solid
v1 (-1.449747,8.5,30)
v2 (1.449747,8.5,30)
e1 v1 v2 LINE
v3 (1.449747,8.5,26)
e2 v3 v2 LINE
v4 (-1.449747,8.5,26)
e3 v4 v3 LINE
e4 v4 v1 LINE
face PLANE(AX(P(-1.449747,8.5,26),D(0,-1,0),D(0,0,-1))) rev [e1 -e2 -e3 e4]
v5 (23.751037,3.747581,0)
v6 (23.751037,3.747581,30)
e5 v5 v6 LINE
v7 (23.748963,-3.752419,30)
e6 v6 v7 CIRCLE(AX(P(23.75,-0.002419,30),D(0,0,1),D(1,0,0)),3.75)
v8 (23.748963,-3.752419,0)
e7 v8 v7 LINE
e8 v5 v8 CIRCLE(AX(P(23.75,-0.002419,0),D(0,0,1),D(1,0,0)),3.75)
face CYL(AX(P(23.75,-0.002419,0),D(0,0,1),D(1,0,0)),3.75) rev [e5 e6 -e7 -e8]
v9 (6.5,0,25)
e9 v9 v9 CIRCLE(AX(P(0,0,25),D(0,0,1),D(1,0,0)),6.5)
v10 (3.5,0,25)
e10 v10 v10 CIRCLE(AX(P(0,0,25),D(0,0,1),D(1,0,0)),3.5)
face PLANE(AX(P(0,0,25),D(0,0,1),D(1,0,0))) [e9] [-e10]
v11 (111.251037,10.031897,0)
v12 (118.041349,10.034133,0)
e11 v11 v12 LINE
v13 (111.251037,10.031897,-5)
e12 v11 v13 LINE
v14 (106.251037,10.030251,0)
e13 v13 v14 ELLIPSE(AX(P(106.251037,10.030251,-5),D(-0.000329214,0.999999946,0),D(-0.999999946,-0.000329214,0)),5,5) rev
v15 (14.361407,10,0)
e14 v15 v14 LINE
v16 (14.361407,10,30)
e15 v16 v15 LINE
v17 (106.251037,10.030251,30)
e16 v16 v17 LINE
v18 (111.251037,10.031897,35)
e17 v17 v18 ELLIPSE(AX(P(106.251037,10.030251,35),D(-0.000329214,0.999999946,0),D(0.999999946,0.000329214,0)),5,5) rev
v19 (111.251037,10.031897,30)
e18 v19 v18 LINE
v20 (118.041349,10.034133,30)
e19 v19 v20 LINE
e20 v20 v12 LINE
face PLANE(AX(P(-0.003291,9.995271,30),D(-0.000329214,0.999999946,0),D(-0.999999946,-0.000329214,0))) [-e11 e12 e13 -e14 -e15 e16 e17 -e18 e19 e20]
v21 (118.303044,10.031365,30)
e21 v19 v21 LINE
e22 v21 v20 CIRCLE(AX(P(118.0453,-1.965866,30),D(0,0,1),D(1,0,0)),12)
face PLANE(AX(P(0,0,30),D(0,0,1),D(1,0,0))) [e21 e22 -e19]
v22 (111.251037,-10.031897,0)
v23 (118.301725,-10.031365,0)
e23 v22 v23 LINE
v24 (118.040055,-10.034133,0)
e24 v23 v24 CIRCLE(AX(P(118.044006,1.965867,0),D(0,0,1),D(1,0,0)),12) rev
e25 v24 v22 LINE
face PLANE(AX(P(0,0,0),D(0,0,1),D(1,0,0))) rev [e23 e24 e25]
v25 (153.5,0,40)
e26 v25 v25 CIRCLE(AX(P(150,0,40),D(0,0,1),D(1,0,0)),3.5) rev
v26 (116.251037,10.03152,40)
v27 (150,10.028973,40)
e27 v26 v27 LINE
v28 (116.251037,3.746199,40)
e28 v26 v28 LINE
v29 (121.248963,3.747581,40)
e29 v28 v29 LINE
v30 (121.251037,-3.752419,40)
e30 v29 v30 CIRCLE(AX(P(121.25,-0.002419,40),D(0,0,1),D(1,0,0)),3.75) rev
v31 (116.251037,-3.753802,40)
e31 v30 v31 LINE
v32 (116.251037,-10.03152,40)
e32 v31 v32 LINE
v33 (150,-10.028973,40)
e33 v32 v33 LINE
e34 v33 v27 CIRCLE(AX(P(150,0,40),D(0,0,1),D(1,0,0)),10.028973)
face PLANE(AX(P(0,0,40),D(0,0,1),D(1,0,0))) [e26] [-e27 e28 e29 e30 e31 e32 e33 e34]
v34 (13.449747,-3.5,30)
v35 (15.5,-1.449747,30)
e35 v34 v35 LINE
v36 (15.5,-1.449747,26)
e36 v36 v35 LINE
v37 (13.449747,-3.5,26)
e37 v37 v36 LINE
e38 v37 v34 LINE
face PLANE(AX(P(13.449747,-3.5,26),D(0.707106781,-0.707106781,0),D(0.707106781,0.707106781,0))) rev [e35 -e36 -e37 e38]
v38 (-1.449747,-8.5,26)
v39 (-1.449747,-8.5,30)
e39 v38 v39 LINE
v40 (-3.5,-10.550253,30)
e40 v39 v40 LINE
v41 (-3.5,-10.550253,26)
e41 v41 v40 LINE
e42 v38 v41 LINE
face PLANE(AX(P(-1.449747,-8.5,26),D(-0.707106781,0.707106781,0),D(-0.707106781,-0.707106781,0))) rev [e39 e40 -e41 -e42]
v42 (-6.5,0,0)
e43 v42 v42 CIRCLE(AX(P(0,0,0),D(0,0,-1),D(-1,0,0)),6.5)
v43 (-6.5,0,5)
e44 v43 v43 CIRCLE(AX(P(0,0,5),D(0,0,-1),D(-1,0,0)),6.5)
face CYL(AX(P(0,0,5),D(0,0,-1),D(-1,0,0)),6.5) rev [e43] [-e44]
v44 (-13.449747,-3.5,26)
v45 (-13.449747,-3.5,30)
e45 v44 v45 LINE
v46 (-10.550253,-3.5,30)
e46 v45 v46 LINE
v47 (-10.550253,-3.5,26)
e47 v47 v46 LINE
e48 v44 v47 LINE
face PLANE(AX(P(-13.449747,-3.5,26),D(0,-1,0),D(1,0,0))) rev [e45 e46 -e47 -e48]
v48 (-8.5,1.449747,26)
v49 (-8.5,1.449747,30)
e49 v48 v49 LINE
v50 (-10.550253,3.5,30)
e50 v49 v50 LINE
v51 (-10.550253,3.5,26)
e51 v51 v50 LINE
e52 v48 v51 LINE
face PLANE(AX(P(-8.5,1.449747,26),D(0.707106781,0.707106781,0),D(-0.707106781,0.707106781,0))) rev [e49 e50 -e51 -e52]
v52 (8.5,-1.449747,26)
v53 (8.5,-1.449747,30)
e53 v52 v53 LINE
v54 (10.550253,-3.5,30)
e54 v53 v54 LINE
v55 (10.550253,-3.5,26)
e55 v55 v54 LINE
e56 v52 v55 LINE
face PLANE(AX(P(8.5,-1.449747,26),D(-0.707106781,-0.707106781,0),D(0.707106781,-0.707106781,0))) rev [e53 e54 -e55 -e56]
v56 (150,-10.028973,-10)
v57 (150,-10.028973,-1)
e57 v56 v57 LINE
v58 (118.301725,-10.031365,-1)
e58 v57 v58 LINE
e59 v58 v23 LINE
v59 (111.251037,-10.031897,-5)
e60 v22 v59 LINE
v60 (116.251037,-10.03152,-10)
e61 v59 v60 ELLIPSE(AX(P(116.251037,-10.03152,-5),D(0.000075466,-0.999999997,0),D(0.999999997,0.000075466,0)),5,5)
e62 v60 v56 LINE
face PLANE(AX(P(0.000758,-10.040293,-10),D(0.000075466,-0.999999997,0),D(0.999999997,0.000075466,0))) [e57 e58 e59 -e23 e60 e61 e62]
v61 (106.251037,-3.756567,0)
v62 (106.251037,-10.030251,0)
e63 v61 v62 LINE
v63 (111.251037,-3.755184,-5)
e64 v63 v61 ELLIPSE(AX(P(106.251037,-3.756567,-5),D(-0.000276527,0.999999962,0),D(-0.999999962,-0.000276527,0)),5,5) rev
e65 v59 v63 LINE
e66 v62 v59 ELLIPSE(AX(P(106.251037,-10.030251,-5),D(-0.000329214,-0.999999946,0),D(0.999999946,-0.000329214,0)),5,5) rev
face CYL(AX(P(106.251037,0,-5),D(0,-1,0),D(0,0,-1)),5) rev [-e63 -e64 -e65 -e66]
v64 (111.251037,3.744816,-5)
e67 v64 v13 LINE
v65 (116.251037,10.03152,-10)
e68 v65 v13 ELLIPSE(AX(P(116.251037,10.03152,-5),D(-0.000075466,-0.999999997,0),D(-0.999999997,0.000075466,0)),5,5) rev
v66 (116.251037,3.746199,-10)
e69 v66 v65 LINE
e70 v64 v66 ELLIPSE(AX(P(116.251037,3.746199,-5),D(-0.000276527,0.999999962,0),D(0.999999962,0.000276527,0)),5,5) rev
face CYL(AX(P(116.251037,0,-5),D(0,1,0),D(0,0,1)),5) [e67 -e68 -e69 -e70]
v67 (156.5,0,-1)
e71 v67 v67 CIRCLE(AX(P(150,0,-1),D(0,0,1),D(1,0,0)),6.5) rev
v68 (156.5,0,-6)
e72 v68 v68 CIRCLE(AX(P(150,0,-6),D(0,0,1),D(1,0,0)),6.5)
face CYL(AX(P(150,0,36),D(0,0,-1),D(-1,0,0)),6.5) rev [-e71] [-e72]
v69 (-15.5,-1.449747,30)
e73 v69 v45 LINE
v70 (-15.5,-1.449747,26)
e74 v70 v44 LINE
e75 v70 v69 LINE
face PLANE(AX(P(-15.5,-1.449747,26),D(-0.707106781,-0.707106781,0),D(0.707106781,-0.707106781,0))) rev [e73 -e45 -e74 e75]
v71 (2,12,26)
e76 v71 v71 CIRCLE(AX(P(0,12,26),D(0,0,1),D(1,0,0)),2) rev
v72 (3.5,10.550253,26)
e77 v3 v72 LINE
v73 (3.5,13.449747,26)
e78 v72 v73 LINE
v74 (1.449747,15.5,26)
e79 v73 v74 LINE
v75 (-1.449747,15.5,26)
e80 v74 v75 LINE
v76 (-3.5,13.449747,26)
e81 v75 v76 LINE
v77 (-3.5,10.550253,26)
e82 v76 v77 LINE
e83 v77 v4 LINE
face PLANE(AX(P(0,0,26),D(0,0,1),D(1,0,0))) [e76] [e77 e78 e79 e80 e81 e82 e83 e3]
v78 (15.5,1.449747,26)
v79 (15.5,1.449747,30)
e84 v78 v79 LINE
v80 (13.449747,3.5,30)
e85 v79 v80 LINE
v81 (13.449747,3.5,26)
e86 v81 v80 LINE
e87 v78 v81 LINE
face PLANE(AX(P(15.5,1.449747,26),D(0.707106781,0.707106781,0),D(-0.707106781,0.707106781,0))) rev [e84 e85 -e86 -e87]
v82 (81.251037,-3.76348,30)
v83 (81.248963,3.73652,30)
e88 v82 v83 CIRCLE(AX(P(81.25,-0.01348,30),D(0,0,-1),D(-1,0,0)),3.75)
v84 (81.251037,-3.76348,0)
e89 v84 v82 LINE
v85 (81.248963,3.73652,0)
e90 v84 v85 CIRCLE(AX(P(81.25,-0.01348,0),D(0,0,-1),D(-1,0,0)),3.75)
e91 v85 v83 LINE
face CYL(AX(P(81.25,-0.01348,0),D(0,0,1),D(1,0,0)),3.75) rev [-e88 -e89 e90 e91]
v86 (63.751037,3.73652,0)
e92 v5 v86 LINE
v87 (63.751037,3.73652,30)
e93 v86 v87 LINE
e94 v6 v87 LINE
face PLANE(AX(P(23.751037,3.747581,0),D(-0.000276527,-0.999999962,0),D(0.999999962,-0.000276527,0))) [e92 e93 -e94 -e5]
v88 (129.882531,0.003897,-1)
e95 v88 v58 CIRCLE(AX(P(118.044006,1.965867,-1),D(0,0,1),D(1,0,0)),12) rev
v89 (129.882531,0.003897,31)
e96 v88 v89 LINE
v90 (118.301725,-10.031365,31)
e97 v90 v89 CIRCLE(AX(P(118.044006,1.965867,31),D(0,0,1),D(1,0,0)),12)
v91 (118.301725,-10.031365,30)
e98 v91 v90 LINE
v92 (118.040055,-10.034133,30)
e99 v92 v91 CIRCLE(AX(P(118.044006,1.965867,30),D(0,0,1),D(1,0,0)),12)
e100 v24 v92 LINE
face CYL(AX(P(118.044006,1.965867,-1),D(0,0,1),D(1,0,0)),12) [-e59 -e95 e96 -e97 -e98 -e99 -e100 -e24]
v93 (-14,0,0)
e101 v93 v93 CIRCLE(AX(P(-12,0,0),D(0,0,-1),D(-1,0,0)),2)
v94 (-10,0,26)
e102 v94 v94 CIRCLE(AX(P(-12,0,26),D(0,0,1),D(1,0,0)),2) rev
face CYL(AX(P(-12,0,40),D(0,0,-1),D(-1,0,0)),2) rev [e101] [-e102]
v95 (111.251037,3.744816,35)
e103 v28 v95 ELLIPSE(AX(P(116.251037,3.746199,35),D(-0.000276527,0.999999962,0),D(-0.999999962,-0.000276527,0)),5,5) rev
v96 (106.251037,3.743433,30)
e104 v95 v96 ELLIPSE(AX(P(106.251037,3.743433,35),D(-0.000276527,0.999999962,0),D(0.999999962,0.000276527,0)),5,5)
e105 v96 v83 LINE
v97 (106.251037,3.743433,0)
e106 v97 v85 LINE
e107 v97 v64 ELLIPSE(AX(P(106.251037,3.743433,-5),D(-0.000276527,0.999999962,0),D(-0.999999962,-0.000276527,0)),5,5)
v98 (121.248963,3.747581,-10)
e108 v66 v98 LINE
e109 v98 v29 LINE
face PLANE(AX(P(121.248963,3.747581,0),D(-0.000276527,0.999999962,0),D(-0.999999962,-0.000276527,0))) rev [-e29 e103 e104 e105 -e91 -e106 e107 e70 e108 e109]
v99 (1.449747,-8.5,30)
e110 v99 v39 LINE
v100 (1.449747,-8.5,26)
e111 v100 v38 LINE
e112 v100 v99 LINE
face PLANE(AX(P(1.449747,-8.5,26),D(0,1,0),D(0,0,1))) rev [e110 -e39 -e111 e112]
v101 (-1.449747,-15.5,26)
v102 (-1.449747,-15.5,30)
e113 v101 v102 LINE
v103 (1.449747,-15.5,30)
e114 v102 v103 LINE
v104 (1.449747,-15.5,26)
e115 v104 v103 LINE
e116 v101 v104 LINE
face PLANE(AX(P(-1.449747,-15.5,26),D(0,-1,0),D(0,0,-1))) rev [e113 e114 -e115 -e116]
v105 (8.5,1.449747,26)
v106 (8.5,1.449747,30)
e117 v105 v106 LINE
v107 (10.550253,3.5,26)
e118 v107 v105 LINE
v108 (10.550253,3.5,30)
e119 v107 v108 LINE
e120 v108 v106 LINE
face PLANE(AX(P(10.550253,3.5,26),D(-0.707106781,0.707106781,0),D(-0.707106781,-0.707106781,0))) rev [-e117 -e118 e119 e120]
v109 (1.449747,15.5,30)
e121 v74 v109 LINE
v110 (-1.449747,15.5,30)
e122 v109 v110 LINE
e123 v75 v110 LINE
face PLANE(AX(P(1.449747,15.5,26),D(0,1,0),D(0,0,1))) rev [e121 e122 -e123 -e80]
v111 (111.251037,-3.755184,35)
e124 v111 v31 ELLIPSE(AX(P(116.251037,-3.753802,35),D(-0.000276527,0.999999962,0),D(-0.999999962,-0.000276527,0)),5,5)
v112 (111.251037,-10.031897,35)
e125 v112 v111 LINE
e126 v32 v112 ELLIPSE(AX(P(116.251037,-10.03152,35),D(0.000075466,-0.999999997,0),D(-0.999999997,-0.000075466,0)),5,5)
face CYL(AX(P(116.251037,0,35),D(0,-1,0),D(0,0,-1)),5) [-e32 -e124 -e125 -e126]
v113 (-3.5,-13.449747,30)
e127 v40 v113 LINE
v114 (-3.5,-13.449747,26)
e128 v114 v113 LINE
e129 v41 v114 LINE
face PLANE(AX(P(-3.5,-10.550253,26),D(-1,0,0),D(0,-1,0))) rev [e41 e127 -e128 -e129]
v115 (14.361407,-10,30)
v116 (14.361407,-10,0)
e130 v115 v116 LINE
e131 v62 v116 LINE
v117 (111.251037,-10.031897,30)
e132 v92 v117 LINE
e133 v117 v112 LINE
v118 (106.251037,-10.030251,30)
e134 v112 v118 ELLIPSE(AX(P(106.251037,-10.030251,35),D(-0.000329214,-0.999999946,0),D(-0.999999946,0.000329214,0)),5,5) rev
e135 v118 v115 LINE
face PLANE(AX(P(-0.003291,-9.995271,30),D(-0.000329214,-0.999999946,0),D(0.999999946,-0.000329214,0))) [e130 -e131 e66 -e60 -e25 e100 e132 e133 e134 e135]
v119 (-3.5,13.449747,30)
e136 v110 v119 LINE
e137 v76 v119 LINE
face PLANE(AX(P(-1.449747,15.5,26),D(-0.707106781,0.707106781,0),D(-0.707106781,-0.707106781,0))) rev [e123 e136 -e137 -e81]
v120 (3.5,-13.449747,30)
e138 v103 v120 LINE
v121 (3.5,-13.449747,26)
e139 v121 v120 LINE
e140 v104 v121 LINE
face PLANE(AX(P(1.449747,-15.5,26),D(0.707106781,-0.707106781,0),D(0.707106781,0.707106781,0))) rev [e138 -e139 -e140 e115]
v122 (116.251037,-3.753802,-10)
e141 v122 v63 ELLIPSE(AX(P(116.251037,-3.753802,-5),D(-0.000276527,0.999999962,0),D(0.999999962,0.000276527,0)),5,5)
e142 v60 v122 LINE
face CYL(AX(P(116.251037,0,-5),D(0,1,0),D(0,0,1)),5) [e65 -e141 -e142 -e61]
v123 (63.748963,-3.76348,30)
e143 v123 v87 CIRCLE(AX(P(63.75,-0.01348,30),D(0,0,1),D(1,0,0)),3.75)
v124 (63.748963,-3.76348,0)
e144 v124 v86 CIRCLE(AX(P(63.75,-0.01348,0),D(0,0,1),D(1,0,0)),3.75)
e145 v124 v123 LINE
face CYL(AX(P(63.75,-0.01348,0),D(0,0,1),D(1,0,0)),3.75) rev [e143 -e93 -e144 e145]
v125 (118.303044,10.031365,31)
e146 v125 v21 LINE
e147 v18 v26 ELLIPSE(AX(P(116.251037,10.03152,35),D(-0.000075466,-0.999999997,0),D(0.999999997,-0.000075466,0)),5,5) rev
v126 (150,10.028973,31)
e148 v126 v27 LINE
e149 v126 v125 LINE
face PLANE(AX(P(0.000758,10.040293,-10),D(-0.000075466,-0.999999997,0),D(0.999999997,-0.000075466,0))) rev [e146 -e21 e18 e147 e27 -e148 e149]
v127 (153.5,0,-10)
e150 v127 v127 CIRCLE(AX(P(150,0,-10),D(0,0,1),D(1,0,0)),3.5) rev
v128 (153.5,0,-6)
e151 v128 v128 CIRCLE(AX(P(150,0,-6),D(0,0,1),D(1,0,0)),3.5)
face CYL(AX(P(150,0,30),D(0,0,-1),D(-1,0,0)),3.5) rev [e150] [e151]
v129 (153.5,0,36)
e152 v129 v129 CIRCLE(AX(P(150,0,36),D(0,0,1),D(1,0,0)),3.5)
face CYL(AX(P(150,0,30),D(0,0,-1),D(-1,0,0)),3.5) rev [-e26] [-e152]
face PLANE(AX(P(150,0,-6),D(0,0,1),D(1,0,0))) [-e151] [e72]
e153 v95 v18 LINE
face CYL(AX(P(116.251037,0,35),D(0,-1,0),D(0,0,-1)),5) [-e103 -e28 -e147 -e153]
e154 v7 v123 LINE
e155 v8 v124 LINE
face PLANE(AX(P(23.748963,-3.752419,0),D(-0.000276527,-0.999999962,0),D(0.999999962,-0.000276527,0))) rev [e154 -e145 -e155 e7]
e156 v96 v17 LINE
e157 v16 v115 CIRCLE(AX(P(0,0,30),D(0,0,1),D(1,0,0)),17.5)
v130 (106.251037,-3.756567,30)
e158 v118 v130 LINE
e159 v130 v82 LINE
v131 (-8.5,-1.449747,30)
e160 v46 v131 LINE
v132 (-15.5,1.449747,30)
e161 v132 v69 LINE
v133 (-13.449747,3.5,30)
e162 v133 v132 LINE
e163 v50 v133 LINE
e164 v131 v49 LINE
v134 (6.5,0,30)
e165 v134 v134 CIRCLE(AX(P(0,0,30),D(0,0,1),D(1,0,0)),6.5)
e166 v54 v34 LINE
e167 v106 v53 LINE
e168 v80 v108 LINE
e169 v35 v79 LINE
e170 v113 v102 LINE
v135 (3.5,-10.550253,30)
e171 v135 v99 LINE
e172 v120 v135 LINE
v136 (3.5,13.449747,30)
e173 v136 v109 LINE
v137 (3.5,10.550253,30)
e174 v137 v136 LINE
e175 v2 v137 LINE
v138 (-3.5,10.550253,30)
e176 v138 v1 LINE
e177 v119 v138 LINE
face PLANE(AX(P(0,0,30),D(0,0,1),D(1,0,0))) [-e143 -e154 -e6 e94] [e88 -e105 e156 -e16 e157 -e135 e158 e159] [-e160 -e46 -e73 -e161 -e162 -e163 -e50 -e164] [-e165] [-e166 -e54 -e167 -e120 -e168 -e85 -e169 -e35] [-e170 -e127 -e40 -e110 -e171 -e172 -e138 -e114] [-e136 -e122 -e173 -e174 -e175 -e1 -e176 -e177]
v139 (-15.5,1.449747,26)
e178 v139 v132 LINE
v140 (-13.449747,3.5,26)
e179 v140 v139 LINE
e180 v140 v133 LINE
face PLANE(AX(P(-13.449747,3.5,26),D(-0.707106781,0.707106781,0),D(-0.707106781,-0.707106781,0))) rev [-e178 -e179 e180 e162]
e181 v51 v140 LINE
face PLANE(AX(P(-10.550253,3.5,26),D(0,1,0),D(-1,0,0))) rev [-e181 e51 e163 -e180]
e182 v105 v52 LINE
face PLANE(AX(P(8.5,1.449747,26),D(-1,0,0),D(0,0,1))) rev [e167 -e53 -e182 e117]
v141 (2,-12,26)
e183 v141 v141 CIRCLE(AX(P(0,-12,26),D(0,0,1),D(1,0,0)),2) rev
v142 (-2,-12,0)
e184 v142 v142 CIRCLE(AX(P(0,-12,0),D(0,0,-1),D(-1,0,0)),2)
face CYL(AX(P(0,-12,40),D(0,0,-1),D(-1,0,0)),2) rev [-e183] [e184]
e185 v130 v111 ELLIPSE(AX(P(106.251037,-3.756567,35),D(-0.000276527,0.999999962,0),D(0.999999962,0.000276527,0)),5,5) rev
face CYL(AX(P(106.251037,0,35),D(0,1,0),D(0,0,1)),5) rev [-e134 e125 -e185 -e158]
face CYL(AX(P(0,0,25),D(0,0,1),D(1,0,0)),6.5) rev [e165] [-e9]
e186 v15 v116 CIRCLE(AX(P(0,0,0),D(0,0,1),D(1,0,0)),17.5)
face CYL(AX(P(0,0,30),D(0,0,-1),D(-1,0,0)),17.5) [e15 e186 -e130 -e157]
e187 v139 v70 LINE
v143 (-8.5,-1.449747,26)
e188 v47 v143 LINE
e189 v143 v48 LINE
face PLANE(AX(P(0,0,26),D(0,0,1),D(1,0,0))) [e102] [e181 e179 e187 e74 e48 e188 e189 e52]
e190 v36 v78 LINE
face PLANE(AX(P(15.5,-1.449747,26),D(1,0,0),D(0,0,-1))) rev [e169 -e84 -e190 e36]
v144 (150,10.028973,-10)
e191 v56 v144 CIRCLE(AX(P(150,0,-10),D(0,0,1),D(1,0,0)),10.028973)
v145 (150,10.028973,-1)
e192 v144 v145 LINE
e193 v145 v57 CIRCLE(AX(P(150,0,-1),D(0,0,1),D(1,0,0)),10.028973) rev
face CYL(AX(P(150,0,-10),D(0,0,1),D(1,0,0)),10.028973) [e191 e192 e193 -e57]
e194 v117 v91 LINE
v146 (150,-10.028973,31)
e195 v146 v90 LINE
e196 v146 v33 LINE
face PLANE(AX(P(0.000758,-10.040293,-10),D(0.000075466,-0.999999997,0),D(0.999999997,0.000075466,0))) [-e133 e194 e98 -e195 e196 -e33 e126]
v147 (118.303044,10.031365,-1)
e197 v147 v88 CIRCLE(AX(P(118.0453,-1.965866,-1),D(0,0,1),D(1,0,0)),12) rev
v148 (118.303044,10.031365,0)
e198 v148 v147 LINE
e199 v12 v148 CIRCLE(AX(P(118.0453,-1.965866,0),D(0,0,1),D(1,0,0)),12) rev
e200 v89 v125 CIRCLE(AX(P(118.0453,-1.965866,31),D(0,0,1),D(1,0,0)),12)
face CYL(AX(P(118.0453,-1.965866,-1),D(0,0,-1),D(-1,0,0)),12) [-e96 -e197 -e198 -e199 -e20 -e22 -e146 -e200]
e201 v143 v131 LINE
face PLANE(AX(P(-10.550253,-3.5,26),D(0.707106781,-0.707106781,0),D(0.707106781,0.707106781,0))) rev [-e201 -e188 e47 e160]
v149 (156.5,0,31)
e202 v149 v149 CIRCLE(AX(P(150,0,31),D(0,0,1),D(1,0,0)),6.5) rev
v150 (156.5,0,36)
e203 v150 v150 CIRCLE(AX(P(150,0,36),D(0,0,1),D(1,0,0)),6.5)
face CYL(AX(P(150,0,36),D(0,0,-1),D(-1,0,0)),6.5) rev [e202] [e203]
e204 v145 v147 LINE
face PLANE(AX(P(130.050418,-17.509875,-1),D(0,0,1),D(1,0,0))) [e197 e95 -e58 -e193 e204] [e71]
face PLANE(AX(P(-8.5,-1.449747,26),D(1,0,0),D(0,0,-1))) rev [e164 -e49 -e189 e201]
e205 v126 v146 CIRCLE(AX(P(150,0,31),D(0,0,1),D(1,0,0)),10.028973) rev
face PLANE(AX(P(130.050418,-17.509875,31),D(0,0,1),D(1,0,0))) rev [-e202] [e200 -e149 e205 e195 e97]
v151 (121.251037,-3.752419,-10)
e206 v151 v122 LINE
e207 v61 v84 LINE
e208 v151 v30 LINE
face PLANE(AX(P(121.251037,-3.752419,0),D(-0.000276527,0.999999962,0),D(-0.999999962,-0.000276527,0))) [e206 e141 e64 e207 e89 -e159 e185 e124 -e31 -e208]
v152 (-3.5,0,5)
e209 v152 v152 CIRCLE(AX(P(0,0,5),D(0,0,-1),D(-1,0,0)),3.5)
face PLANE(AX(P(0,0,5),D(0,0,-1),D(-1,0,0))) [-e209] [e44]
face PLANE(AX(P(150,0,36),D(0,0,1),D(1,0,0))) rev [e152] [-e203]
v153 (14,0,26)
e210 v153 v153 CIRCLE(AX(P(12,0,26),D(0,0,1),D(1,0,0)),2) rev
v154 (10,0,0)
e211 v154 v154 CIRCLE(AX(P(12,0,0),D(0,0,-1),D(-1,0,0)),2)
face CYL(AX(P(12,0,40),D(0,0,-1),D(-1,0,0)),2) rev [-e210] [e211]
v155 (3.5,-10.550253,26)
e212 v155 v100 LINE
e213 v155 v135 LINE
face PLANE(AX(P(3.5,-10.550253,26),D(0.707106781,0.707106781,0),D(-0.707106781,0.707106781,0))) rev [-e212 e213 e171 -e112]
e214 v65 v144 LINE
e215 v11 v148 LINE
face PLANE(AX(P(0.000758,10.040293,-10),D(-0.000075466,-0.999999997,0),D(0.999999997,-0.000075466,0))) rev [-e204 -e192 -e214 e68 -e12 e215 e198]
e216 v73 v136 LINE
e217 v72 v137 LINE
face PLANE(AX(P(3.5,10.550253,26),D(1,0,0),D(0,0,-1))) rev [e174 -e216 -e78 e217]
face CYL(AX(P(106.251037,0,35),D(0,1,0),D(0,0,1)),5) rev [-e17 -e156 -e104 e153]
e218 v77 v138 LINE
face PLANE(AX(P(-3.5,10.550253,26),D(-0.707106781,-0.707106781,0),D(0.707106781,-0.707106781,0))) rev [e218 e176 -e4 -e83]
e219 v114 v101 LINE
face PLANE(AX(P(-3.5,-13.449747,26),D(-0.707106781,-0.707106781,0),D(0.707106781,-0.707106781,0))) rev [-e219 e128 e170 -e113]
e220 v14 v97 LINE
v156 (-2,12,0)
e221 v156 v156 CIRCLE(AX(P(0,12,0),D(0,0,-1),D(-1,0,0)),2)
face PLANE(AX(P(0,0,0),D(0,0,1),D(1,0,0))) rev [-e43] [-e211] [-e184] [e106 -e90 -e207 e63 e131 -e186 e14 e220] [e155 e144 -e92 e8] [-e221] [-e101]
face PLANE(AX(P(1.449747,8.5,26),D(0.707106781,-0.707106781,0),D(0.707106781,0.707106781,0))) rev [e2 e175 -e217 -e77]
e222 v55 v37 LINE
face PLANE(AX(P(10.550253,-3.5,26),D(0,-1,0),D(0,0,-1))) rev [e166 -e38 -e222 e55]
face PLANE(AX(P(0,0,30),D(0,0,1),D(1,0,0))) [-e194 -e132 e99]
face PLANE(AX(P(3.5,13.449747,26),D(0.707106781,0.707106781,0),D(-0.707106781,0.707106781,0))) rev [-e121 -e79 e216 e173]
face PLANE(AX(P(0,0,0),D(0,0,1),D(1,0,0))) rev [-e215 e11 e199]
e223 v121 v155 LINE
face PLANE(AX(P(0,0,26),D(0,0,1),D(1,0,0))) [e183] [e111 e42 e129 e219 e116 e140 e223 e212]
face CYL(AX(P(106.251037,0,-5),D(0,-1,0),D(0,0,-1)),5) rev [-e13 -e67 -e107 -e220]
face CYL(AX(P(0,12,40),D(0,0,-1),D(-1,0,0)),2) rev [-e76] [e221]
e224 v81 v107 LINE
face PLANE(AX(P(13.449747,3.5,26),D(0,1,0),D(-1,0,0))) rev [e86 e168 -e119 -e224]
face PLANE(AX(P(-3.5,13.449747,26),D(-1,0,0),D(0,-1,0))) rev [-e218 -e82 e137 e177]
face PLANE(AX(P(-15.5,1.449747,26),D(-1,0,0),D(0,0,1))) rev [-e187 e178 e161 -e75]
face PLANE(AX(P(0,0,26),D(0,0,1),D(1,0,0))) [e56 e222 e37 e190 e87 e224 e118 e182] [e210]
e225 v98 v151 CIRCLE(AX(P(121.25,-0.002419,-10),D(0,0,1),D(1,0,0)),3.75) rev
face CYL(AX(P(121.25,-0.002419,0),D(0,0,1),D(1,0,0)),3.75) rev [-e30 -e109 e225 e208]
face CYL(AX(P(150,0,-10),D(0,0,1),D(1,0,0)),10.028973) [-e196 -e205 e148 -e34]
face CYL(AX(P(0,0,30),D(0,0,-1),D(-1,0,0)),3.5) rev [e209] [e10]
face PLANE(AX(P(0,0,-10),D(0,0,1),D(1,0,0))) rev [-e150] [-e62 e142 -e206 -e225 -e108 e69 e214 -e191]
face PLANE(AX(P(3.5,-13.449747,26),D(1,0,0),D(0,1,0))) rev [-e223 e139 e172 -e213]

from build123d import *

# Parameters (mm, degrees)
BOSS_EXTRUDE1_OUTLINE_R  = 3.5
BOSS_EXTRUDE1_DEPTH      = 30
CUT_EXTRUDE6_DEPTH       = 164.769781491
BOSS_EXTRUDE3_START      = -40
BOSS_EXTRUDE3_OUTLINE_R  = 3.5
BOSS_EXTRUDE3_DEPTH      = 50
SKETCH18_W               = 30
SKETCH18_H               = 32
CUT_EXTRUDE7_DEPTH       = 168.246328946
FILLET1_R                = 5
SKETCH19_R               = 6.5
CUT_EXTRUDE8_DEPTH       = 5
CUT_EXTRUDE9_START       = -5
SKETCH20_R               = 6.5
CUT_EXTRUDE9_DEPTH       = 5
SKETCH22_R               = 2
CUT_EXTRUDE10_DEPTH      = 166.878034319
CUT_EXTRUDE11_DEPTH      = 4
CUT_EXTRUDE12_DEPTH      = 37
CUT_EXTRUDE12_DEPTH_BACK = 5
SKETCH24_R               = 6.5
FILLET2_R                = 12


# Read off the part's stored shape, not the designer's step: Boss-Extrude1, Boss-Extrude3
with BuildPart() as part:
    # Boss-Extrude1 outline → Boss-Extrude1 (new body)
    with BuildSketch(Plane.XY):
        with BuildLine():
            ThreePointArc((150, -10.044654174), (160.044654174, 0), (150, 10.044654174))
            Line((150, 10.044654174), (14.361406616, 10))
            ThreePointArc((14.361406616, 10), (-17.5, 0), (14.361406616, -10))
            Line((14.361406616, -10), (150, -10.044654174))
        make_face()
        Circle(BOSS_EXTRUDE1_OUTLINE_R, mode=Mode.SUBTRACT)
        with Locations((150, 0)):
            Circle(BOSS_EXTRUDE1_OUTLINE_R, mode=Mode.SUBTRACT)
    extrude(amount=BOSS_EXTRUDE1_DEPTH)

    # Sketch16 → Cut-Extrude6 (cut, through all)
    with BuildSketch(Plane.XY.offset(30)):
        with BuildLine():
            Line((23.751036832, 3.747580757), (63.751036832, 3.736519684))
            ThreePointArc((63.751036832, 3.736519684), (67.499999713, -0.014517148), (63.748962881, -3.763480029))
            Line((63.748962881, -3.763480029), (23.748962881, -3.752418957))
            ThreePointArc((23.748962881, -3.752418957), (20, -0.001382124), (23.751036832, 3.747580757))
        make_face()
        with BuildLine():
            Line((121.248962594, 3.747580757), (81.248962594, 3.736519684))
            ThreePointArc((81.248962594, 3.736519684), (77.499999713, -0.014517148), (81.251036545, -3.763480029))
            Line((81.251036545, -3.763480029), (121.251036545, -3.752418957))
            ThreePointArc((121.251036545, -3.752418957), (124.999999426, -0.001382124), (121.248962594, 3.747580757))
        make_face()
    extrude(amount=-CUT_EXTRUDE6_DEPTH, mode=Mode.SUBTRACT)

    # Boss-Extrude3 outline → Boss-Extrude3 (add)
    with BuildSketch(Plane.XY.offset(30).offset(BOSS_EXTRUDE3_START)):
        with BuildLine():
            ThreePointArc((121.248962594, 3.747580757), (124.999999426, -0.001382125), (121.251036545, -3.752418957))
            Line((121.251036545, -3.752418957), (111.251036642, -3.755184225))
            Line((111.251036642, -3.755184225), (111.251036642, -10.031897459))
            Line((111.251036642, -10.031897459), (150, -10.028973219))
            ThreePointArc((150, -10.028973219), (160.028973219, 0), (150, 10.028973219))
            Line((150, 10.028973219), (111.251036642, 10.031897459))
            Line((111.251036642, 10.031897459), (111.251036642, 3.744816062))
            Line((111.251036642, 3.744816062), (121.248962594, 3.747580757))
        make_face()
        with Locations((150, 0)):
            Circle(BOSS_EXTRUDE3_OUTLINE_R, mode=Mode.SUBTRACT)
    extrude(amount=BOSS_EXTRUDE3_DEPTH)

    # Sketch18 → Cut-Extrude7 (cut, through all)
    with BuildSketch(Plane(origin=(-0.003290587, 9.995270935, 0), x_dir=(0.9999999458089536, 0.00032921435296474953, 0), z_dir=(-0.00032921435296474953, 0.9999999458089536, 0))):
        with Locations((145.044646414, -15)):
            Rectangle(SKETCH18_W, SKETCH18_H)
    extrude(amount=-CUT_EXTRUDE7_DEPTH, mode=Mode.SUBTRACT)

    # Fillet1
    # the kernel refuses this fillet: 5 mm, written as the material it adds along each edge
    with BuildSketch(Plane(origin=(111.251036642, -22.531897459, 30), x_dir=(-1, 0, 0), z_dir=(0, 1, 0))) as fillet1_piece_1_section:
        with BuildLine():
            CenterArc((FILLET1_R, FILLET1_R), FILLET1_R, 180, 90)
            Line((0, FILLET1_R), (0, 0))
            Line((0, 0), (FILLET1_R, 0))
        make_face()
    fillet1_piece_1 = extrude(amount=31.276713234, mode=Mode.PRIVATE)
    fillet1_piece_1 = split(fillet1_piece_1, bisect_by=Plane(origin=(110.118139828, -10.031524493, 31.132041481), z_dir=(0.0003292143516537731, 0.9999999458089539, 0)), keep=Keep.TOP, mode=Mode.PRIVATE)
    fillet1_piece_1 = split(fillet1_piece_1, bisect_by=Plane(origin=(110.118305162, -3.755497455, 31.132041481), z_dir=(0.00027652679874676846, -0.9999999617664641, 0)), keep=Keep.TOP, mode=Mode.PRIVATE)
    add(fillet1_piece_1)
    with BuildSketch(Plane(origin=(111.251036642, -22.531897459, 30), x_dir=(-1, 0, 0), z_dir=(0, 1, 0))) as fillet1_piece_2_section:
        with BuildLine():
            CenterArc((FILLET1_R, FILLET1_R), FILLET1_R, 180, 90)
            Line((0, FILLET1_R), (0, 0))
            Line((0, 0), (FILLET1_R, 0))
        make_face()
    fillet1_piece_2 = extrude(amount=31.276713234, mode=Mode.PRIVATE)
    fillet1_piece_2 = split(fillet1_piece_2, bisect_by=Plane(origin=(110.119688174, 3.744503214, 31.131937612), z_dir=(-0.00027652679874677963, 0.9999999617664641, 0)), keep=Keep.TOP, mode=Mode.PRIVATE)
    add(fillet1_piece_2)
    with BuildSketch(Plane(origin=(111.251036642, -22.531897459, 0), x_dir=(-1, 0, 0), z_dir=(0, 1, 0))) as fillet1_piece_3_section:
        with BuildLine():
            CenterArc((FILLET1_R, -FILLET1_R), FILLET1_R, 90, 90)
            Line((0, -FILLET1_R), (0, 0))
            Line((0, 0), (FILLET1_R, 0))
        make_face()
    fillet1_piece_3 = extrude(amount=31.276713234, mode=Mode.PRIVATE)
    fillet1_piece_3 = split(fillet1_piece_3, bisect_by=Plane(origin=(110.118139828, -10.031524493, -1.132041481), z_dir=(0.0003292143516537731, 0.9999999458089539, 0)), keep=Keep.TOP, mode=Mode.PRIVATE)
    fillet1_piece_3 = split(fillet1_piece_3, bisect_by=Plane(origin=(110.118305162, -3.755497455, -1.132041481), z_dir=(0.00027652679874676846, -0.9999999617664641, 0)), keep=Keep.TOP, mode=Mode.PRIVATE)
    add(fillet1_piece_3)
    with BuildSketch(Plane(origin=(111.251036642, -22.531897459, 0), x_dir=(-1, 0, 0), z_dir=(0, 1, 0))) as fillet1_piece_4_section:
        with BuildLine():
            CenterArc((FILLET1_R, -FILLET1_R), FILLET1_R, 90, 90)
            Line((0, -FILLET1_R), (0, 0))
            Line((0, 0), (FILLET1_R, 0))
        make_face()
    fillet1_piece_4 = extrude(amount=31.276713234, mode=Mode.PRIVATE)
    fillet1_piece_4 = split(fillet1_piece_4, bisect_by=Plane(origin=(110.119688174, 3.744503214, -1.131937612), z_dir=(-0.00027652679874677963, 0.9999999617664641, 0)), keep=Keep.TOP, mode=Mode.PRIVATE)
    add(fillet1_piece_4)
    with BuildSketch(Plane(origin=(111.251036642, -8.755183938, 30), x_dir=(-1, 0, 0), z_dir=(0, 1, 0))) as fillet1_piece_5_section:
        with BuildLine():
            CenterArc((FILLET1_R, FILLET1_R), FILLET1_R, 180, 90)
            Line((0, FILLET1_R), (0, 0))
            Line((0, 0), (FILLET1_R, 0))
        make_face()
    fillet1_piece_5 = extrude(amount=31.287081397, mode=Mode.PRIVATE)
    fillet1_piece_5 = split(fillet1_piece_5, bisect_by=Plane(origin=(110.118434062, -3.75549742, 31.132013536), z_dir=(0.00027652679874676846, -0.9999999617664641, 0)), keep=Keep.TOP, mode=Mode.PRIVATE)
    add(fillet1_piece_5)
    with BuildSketch(Plane(origin=(111.251036642, -8.755183938, 30), x_dir=(-1, 0, 0), z_dir=(0, 1, 0))) as fillet1_piece_6_section:
        with BuildLine():
            CenterArc((FILLET1_R, FILLET1_R), FILLET1_R, 180, 90)
            Line((0, FILLET1_R), (0, 0))
            Line((0, 0), (FILLET1_R, 0))
        make_face()
    fillet1_piece_6 = extrude(amount=31.287081397, mode=Mode.PRIVATE)
    fillet1_piece_6 = split(fillet1_piece_6, bisect_by=Plane(origin=(110.11803561, 10.031524458, 31.131980984), z_dir=(0.0003292143516537731, -0.9999999458089539, 0)), keep=Keep.TOP, mode=Mode.PRIVATE)
    fillet1_piece_6 = split(fillet1_piece_6, bisect_by=Plane(origin=(110.119939764, 3.744503284, 31.131980984), z_dir=(-0.00027652679874677963, 0.9999999617664641, 0)), keep=Keep.TOP, mode=Mode.PRIVATE)
    add(fillet1_piece_6)
    with BuildSketch(Plane(origin=(111.251036642, -8.755183938, 0), x_dir=(-1, 0, 0), z_dir=(0, 1, 0))) as fillet1_piece_7_section:
        with BuildLine():
            CenterArc((FILLET1_R, -FILLET1_R), FILLET1_R, 90, 90)
            Line((0, -FILLET1_R), (0, 0))
            Line((0, 0), (FILLET1_R, 0))
        make_face()
    fillet1_piece_7 = extrude(amount=31.287081397, mode=Mode.PRIVATE)
    fillet1_piece_7 = split(fillet1_piece_7, bisect_by=Plane(origin=(110.118434062, -3.75549742, -1.132013536), z_dir=(0.00027652679874676846, -0.9999999617664641, 0)), keep=Keep.TOP, mode=Mode.PRIVATE)
    add(fillet1_piece_7)
    with BuildSketch(Plane(origin=(111.251036642, -8.755183938, 0), x_dir=(-1, 0, 0), z_dir=(0, 1, 0))) as fillet1_piece_8_section:
        with BuildLine():
            CenterArc((FILLET1_R, -FILLET1_R), FILLET1_R, 90, 90)
            Line((0, -FILLET1_R), (0, 0))
            Line((0, 0), (FILLET1_R, 0))
        make_face()
    fillet1_piece_8 = extrude(amount=31.287081397, mode=Mode.PRIVATE)
    fillet1_piece_8 = split(fillet1_piece_8, bisect_by=Plane(origin=(110.11803561, 10.031524458, -1.131980984), z_dir=(0.0003292143516537731, -0.9999999458089539, 0)), keep=Keep.TOP, mode=Mode.PRIVATE)
    fillet1_piece_8 = split(fillet1_piece_8, bisect_by=Plane(origin=(110.119939764, 3.744503284, -1.131980984), z_dir=(-0.00027652679874677963, 0.9999999617664641, 0)), keep=Keep.TOP, mode=Mode.PRIVATE)
    add(fillet1_piece_8)
    # the kernel refuses this fillet: 5 mm, written as the material it takes off along each edge
    with BuildSketch(Plane(origin=(111.251036642, 8.744815775, 40), x_dir=(0, 0, -1), z_dir=(0, -1, 0)), Plane(origin=(111.251036642, 8.744815775, -10), x_dir=(1, 0, 0), z_dir=(0, -1, 0))) as fillet1_2_piece_1:
        with BuildLine():
            CenterArc((FILLET1_R, FILLET1_R), FILLET1_R, 180, 90)
            Line((0, FILLET1_R), (0, 0))
            Line((0, 0), (FILLET1_R, 0))
        make_face()
    extrude(amount=31.276713234, mode=Mode.SUBTRACT)
    with BuildSketch(Plane(origin=(111.251036642, 22.531897459, 40), x_dir=(1, 0, 0), z_dir=(0, -1, 0)), Plane(origin=(111.251036642, 22.531897459, -10), x_dir=(0, 0, 1), z_dir=(0, -1, 0))) as fillet1_2_piece_2:
        with BuildLine():
            CenterArc((FILLET1_R, -FILLET1_R), FILLET1_R, 90, 90)
            Line((0, -FILLET1_R), (0, 0))
            Line((0, 0), (FILLET1_R, 0))
        make_face()
    extrude(amount=31.287081397, mode=Mode.SUBTRACT)

    # Sketch19 → Cut-Extrude8 (cut)
    with BuildSketch(Plane.XY.offset(30)):
        Circle(SKETCH19_R)
    extrude(amount=-CUT_EXTRUDE8_DEPTH, mode=Mode.SUBTRACT)

    # Sketch20 → Cut-Extrude9 (cut)
    with BuildSketch(Plane(origin=(0, 0, 0), x_dir=(-1, 0, 0), z_dir=(0, 0, -1)).offset(CUT_EXTRUDE9_START)):
        with Locations(Location((0, 0, 0), (0, 0, 180))):
            Circle(SKETCH20_R)
    extrude(amount=CUT_EXTRUDE9_DEPTH, mode=Mode.SUBTRACT)

    # Sketch22 → Cut-Extrude10 (cut, through all)
    with BuildSketch(Plane(origin=(0, 0, 0), x_dir=(-1, 0, 0), z_dir=(0, 0, -1))):
        with Locations((-12, 0)):
            Circle(SKETCH22_R)
        with Locations((0, 12)):
            Circle(SKETCH22_R)
        with Locations((12, 0)):
            Circle(SKETCH22_R)
        with Locations((0, -12)):
            Circle(SKETCH22_R)
    extrude(amount=-CUT_EXTRUDE10_DEPTH, mode=Mode.SUBTRACT)

    # Sketch23 → Cut-Extrude11 (cut)
    with BuildSketch(Plane.XY.offset(30)):
        Polygon((-1.449747468, 8.5), (1.449747468, 8.5), (3.5, 10.550252532), (3.5, 13.449747468), (1.449747468, 15.5), (-1.449747468, 15.5), (-3.5, 13.449747468), (-3.5, 10.550252532), align=None)
        Polygon((10.550252532, 3.5), (8.5, 1.449747468), (8.5, -1.449747468), (10.550252532, -3.5), (13.449747468, -3.5), (15.5, -1.449747468), (15.5, 1.449747468), (13.449747468, 3.5), align=None)
        Polygon((3.5, -10.550252532), (1.449747468, -8.5), (-1.449747468, -8.5), (-3.5, -10.550252532), (-3.5, -13.449747468), (-1.449747468, -15.5), (1.449747468, -15.5), (3.5, -13.449747468), align=None)
        Polygon((-10.550252532, -3.5), (-8.5, -1.449747468), (-8.5, 1.449747468), (-10.550252532, 3.5), (-13.449747468, 3.5), (-15.5, 1.449747468), (-15.5, -1.449747468), (-13.449747468, -3.5), align=None)
    extrude(amount=-CUT_EXTRUDE11_DEPTH, mode=Mode.SUBTRACT)

    # Sketch24 → Cut-Extrude12 (cut, two sides: drawn at the far end of the back side and taken through both)
    with BuildSketch(Plane.XY.offset(-1).offset(-CUT_EXTRUDE12_DEPTH_BACK)):
        with Locations((150, 0)):
            Circle(SKETCH24_R)
    extrude(amount=CUT_EXTRUDE12_DEPTH + CUT_EXTRUDE12_DEPTH_BACK, mode=Mode.SUBTRACT)

    # Fillet2
    # the kernel refuses this fillet: 12 mm, written as the material it takes off along each edge
    with BuildSketch(Plane(origin=(130.047958143, -10.038085675, 60.019759367), x_dir=(-0.9999999458089538, 0.00032921435200012727, 0), z_dir=(0, 0, -1))) as fillet2_piece_1_section:
        with BuildLine():
            CenterArc((FILLET2_R * 1.00065864558, FILLET2_R), FILLET2_R, 179.962274813, 90.037725187)
            Line((FILLET2_R * 0.000658862340412, FILLET2_R * 1.00065842867), (0, 0))
            Line((0, 0), (FILLET2_R * 1.00065864558, 0))
        make_face()
    fillet2_piece_1 = extrude(amount=90.039518735, mode=Mode.PRIVATE)
    fillet2_piece_1 = split(fillet2_piece_1, bisect_by=Plane(origin=(127.369282956, -7.349412759, -1), z_dir=(0, 0, 1)), keep=Keep.TOP, mode=Mode.PRIVATE)
    fillet2_piece_1 = split(fillet2_piece_1, bisect_by=Plane(origin=(127.369282956, -7.349412759, 31), z_dir=(0, 0, -1)), keep=Keep.TOP, mode=Mode.PRIVATE)
    add(fillet2_piece_1, mode=Mode.SUBTRACT)
    with BuildSketch(Plane(origin=(130.04134878, 10.038083499, 60), x_dir=(-0.9999999458089538, -0.0003292143520001209, 0), z_dir=(0, 0, -1))) as fillet2_piece_2_section:
        with BuildLine():
            CenterArc((FILLET2_R, -FILLET2_R), FILLET2_R, 90, 90)
            Line((0, -FILLET2_R), (0, 0))
            Line((0, 0), (FILLET2_R, 0))
        make_face()
    fillet2_piece_2 = extrude(amount=90.000000001, mode=Mode.PRIVATE)
    fillet2_piece_2 = split(fillet2_piece_2, bisect_by=Plane(origin=(127.366469067, 7.351436926, -1), z_dir=(0, 0, 1)), keep=Keep.TOP, mode=Mode.PRIVATE)
    fillet2_piece_2 = split(fillet2_piece_2, bisect_by=Plane(origin=(127.366469067, 7.351436926, 31), z_dir=(0, 0, -1)), keep=Keep.TOP, mode=Mode.PRIVATE)
    add(fillet2_piece_2, mode=Mode.SUBTRACT)


solid = part.part
